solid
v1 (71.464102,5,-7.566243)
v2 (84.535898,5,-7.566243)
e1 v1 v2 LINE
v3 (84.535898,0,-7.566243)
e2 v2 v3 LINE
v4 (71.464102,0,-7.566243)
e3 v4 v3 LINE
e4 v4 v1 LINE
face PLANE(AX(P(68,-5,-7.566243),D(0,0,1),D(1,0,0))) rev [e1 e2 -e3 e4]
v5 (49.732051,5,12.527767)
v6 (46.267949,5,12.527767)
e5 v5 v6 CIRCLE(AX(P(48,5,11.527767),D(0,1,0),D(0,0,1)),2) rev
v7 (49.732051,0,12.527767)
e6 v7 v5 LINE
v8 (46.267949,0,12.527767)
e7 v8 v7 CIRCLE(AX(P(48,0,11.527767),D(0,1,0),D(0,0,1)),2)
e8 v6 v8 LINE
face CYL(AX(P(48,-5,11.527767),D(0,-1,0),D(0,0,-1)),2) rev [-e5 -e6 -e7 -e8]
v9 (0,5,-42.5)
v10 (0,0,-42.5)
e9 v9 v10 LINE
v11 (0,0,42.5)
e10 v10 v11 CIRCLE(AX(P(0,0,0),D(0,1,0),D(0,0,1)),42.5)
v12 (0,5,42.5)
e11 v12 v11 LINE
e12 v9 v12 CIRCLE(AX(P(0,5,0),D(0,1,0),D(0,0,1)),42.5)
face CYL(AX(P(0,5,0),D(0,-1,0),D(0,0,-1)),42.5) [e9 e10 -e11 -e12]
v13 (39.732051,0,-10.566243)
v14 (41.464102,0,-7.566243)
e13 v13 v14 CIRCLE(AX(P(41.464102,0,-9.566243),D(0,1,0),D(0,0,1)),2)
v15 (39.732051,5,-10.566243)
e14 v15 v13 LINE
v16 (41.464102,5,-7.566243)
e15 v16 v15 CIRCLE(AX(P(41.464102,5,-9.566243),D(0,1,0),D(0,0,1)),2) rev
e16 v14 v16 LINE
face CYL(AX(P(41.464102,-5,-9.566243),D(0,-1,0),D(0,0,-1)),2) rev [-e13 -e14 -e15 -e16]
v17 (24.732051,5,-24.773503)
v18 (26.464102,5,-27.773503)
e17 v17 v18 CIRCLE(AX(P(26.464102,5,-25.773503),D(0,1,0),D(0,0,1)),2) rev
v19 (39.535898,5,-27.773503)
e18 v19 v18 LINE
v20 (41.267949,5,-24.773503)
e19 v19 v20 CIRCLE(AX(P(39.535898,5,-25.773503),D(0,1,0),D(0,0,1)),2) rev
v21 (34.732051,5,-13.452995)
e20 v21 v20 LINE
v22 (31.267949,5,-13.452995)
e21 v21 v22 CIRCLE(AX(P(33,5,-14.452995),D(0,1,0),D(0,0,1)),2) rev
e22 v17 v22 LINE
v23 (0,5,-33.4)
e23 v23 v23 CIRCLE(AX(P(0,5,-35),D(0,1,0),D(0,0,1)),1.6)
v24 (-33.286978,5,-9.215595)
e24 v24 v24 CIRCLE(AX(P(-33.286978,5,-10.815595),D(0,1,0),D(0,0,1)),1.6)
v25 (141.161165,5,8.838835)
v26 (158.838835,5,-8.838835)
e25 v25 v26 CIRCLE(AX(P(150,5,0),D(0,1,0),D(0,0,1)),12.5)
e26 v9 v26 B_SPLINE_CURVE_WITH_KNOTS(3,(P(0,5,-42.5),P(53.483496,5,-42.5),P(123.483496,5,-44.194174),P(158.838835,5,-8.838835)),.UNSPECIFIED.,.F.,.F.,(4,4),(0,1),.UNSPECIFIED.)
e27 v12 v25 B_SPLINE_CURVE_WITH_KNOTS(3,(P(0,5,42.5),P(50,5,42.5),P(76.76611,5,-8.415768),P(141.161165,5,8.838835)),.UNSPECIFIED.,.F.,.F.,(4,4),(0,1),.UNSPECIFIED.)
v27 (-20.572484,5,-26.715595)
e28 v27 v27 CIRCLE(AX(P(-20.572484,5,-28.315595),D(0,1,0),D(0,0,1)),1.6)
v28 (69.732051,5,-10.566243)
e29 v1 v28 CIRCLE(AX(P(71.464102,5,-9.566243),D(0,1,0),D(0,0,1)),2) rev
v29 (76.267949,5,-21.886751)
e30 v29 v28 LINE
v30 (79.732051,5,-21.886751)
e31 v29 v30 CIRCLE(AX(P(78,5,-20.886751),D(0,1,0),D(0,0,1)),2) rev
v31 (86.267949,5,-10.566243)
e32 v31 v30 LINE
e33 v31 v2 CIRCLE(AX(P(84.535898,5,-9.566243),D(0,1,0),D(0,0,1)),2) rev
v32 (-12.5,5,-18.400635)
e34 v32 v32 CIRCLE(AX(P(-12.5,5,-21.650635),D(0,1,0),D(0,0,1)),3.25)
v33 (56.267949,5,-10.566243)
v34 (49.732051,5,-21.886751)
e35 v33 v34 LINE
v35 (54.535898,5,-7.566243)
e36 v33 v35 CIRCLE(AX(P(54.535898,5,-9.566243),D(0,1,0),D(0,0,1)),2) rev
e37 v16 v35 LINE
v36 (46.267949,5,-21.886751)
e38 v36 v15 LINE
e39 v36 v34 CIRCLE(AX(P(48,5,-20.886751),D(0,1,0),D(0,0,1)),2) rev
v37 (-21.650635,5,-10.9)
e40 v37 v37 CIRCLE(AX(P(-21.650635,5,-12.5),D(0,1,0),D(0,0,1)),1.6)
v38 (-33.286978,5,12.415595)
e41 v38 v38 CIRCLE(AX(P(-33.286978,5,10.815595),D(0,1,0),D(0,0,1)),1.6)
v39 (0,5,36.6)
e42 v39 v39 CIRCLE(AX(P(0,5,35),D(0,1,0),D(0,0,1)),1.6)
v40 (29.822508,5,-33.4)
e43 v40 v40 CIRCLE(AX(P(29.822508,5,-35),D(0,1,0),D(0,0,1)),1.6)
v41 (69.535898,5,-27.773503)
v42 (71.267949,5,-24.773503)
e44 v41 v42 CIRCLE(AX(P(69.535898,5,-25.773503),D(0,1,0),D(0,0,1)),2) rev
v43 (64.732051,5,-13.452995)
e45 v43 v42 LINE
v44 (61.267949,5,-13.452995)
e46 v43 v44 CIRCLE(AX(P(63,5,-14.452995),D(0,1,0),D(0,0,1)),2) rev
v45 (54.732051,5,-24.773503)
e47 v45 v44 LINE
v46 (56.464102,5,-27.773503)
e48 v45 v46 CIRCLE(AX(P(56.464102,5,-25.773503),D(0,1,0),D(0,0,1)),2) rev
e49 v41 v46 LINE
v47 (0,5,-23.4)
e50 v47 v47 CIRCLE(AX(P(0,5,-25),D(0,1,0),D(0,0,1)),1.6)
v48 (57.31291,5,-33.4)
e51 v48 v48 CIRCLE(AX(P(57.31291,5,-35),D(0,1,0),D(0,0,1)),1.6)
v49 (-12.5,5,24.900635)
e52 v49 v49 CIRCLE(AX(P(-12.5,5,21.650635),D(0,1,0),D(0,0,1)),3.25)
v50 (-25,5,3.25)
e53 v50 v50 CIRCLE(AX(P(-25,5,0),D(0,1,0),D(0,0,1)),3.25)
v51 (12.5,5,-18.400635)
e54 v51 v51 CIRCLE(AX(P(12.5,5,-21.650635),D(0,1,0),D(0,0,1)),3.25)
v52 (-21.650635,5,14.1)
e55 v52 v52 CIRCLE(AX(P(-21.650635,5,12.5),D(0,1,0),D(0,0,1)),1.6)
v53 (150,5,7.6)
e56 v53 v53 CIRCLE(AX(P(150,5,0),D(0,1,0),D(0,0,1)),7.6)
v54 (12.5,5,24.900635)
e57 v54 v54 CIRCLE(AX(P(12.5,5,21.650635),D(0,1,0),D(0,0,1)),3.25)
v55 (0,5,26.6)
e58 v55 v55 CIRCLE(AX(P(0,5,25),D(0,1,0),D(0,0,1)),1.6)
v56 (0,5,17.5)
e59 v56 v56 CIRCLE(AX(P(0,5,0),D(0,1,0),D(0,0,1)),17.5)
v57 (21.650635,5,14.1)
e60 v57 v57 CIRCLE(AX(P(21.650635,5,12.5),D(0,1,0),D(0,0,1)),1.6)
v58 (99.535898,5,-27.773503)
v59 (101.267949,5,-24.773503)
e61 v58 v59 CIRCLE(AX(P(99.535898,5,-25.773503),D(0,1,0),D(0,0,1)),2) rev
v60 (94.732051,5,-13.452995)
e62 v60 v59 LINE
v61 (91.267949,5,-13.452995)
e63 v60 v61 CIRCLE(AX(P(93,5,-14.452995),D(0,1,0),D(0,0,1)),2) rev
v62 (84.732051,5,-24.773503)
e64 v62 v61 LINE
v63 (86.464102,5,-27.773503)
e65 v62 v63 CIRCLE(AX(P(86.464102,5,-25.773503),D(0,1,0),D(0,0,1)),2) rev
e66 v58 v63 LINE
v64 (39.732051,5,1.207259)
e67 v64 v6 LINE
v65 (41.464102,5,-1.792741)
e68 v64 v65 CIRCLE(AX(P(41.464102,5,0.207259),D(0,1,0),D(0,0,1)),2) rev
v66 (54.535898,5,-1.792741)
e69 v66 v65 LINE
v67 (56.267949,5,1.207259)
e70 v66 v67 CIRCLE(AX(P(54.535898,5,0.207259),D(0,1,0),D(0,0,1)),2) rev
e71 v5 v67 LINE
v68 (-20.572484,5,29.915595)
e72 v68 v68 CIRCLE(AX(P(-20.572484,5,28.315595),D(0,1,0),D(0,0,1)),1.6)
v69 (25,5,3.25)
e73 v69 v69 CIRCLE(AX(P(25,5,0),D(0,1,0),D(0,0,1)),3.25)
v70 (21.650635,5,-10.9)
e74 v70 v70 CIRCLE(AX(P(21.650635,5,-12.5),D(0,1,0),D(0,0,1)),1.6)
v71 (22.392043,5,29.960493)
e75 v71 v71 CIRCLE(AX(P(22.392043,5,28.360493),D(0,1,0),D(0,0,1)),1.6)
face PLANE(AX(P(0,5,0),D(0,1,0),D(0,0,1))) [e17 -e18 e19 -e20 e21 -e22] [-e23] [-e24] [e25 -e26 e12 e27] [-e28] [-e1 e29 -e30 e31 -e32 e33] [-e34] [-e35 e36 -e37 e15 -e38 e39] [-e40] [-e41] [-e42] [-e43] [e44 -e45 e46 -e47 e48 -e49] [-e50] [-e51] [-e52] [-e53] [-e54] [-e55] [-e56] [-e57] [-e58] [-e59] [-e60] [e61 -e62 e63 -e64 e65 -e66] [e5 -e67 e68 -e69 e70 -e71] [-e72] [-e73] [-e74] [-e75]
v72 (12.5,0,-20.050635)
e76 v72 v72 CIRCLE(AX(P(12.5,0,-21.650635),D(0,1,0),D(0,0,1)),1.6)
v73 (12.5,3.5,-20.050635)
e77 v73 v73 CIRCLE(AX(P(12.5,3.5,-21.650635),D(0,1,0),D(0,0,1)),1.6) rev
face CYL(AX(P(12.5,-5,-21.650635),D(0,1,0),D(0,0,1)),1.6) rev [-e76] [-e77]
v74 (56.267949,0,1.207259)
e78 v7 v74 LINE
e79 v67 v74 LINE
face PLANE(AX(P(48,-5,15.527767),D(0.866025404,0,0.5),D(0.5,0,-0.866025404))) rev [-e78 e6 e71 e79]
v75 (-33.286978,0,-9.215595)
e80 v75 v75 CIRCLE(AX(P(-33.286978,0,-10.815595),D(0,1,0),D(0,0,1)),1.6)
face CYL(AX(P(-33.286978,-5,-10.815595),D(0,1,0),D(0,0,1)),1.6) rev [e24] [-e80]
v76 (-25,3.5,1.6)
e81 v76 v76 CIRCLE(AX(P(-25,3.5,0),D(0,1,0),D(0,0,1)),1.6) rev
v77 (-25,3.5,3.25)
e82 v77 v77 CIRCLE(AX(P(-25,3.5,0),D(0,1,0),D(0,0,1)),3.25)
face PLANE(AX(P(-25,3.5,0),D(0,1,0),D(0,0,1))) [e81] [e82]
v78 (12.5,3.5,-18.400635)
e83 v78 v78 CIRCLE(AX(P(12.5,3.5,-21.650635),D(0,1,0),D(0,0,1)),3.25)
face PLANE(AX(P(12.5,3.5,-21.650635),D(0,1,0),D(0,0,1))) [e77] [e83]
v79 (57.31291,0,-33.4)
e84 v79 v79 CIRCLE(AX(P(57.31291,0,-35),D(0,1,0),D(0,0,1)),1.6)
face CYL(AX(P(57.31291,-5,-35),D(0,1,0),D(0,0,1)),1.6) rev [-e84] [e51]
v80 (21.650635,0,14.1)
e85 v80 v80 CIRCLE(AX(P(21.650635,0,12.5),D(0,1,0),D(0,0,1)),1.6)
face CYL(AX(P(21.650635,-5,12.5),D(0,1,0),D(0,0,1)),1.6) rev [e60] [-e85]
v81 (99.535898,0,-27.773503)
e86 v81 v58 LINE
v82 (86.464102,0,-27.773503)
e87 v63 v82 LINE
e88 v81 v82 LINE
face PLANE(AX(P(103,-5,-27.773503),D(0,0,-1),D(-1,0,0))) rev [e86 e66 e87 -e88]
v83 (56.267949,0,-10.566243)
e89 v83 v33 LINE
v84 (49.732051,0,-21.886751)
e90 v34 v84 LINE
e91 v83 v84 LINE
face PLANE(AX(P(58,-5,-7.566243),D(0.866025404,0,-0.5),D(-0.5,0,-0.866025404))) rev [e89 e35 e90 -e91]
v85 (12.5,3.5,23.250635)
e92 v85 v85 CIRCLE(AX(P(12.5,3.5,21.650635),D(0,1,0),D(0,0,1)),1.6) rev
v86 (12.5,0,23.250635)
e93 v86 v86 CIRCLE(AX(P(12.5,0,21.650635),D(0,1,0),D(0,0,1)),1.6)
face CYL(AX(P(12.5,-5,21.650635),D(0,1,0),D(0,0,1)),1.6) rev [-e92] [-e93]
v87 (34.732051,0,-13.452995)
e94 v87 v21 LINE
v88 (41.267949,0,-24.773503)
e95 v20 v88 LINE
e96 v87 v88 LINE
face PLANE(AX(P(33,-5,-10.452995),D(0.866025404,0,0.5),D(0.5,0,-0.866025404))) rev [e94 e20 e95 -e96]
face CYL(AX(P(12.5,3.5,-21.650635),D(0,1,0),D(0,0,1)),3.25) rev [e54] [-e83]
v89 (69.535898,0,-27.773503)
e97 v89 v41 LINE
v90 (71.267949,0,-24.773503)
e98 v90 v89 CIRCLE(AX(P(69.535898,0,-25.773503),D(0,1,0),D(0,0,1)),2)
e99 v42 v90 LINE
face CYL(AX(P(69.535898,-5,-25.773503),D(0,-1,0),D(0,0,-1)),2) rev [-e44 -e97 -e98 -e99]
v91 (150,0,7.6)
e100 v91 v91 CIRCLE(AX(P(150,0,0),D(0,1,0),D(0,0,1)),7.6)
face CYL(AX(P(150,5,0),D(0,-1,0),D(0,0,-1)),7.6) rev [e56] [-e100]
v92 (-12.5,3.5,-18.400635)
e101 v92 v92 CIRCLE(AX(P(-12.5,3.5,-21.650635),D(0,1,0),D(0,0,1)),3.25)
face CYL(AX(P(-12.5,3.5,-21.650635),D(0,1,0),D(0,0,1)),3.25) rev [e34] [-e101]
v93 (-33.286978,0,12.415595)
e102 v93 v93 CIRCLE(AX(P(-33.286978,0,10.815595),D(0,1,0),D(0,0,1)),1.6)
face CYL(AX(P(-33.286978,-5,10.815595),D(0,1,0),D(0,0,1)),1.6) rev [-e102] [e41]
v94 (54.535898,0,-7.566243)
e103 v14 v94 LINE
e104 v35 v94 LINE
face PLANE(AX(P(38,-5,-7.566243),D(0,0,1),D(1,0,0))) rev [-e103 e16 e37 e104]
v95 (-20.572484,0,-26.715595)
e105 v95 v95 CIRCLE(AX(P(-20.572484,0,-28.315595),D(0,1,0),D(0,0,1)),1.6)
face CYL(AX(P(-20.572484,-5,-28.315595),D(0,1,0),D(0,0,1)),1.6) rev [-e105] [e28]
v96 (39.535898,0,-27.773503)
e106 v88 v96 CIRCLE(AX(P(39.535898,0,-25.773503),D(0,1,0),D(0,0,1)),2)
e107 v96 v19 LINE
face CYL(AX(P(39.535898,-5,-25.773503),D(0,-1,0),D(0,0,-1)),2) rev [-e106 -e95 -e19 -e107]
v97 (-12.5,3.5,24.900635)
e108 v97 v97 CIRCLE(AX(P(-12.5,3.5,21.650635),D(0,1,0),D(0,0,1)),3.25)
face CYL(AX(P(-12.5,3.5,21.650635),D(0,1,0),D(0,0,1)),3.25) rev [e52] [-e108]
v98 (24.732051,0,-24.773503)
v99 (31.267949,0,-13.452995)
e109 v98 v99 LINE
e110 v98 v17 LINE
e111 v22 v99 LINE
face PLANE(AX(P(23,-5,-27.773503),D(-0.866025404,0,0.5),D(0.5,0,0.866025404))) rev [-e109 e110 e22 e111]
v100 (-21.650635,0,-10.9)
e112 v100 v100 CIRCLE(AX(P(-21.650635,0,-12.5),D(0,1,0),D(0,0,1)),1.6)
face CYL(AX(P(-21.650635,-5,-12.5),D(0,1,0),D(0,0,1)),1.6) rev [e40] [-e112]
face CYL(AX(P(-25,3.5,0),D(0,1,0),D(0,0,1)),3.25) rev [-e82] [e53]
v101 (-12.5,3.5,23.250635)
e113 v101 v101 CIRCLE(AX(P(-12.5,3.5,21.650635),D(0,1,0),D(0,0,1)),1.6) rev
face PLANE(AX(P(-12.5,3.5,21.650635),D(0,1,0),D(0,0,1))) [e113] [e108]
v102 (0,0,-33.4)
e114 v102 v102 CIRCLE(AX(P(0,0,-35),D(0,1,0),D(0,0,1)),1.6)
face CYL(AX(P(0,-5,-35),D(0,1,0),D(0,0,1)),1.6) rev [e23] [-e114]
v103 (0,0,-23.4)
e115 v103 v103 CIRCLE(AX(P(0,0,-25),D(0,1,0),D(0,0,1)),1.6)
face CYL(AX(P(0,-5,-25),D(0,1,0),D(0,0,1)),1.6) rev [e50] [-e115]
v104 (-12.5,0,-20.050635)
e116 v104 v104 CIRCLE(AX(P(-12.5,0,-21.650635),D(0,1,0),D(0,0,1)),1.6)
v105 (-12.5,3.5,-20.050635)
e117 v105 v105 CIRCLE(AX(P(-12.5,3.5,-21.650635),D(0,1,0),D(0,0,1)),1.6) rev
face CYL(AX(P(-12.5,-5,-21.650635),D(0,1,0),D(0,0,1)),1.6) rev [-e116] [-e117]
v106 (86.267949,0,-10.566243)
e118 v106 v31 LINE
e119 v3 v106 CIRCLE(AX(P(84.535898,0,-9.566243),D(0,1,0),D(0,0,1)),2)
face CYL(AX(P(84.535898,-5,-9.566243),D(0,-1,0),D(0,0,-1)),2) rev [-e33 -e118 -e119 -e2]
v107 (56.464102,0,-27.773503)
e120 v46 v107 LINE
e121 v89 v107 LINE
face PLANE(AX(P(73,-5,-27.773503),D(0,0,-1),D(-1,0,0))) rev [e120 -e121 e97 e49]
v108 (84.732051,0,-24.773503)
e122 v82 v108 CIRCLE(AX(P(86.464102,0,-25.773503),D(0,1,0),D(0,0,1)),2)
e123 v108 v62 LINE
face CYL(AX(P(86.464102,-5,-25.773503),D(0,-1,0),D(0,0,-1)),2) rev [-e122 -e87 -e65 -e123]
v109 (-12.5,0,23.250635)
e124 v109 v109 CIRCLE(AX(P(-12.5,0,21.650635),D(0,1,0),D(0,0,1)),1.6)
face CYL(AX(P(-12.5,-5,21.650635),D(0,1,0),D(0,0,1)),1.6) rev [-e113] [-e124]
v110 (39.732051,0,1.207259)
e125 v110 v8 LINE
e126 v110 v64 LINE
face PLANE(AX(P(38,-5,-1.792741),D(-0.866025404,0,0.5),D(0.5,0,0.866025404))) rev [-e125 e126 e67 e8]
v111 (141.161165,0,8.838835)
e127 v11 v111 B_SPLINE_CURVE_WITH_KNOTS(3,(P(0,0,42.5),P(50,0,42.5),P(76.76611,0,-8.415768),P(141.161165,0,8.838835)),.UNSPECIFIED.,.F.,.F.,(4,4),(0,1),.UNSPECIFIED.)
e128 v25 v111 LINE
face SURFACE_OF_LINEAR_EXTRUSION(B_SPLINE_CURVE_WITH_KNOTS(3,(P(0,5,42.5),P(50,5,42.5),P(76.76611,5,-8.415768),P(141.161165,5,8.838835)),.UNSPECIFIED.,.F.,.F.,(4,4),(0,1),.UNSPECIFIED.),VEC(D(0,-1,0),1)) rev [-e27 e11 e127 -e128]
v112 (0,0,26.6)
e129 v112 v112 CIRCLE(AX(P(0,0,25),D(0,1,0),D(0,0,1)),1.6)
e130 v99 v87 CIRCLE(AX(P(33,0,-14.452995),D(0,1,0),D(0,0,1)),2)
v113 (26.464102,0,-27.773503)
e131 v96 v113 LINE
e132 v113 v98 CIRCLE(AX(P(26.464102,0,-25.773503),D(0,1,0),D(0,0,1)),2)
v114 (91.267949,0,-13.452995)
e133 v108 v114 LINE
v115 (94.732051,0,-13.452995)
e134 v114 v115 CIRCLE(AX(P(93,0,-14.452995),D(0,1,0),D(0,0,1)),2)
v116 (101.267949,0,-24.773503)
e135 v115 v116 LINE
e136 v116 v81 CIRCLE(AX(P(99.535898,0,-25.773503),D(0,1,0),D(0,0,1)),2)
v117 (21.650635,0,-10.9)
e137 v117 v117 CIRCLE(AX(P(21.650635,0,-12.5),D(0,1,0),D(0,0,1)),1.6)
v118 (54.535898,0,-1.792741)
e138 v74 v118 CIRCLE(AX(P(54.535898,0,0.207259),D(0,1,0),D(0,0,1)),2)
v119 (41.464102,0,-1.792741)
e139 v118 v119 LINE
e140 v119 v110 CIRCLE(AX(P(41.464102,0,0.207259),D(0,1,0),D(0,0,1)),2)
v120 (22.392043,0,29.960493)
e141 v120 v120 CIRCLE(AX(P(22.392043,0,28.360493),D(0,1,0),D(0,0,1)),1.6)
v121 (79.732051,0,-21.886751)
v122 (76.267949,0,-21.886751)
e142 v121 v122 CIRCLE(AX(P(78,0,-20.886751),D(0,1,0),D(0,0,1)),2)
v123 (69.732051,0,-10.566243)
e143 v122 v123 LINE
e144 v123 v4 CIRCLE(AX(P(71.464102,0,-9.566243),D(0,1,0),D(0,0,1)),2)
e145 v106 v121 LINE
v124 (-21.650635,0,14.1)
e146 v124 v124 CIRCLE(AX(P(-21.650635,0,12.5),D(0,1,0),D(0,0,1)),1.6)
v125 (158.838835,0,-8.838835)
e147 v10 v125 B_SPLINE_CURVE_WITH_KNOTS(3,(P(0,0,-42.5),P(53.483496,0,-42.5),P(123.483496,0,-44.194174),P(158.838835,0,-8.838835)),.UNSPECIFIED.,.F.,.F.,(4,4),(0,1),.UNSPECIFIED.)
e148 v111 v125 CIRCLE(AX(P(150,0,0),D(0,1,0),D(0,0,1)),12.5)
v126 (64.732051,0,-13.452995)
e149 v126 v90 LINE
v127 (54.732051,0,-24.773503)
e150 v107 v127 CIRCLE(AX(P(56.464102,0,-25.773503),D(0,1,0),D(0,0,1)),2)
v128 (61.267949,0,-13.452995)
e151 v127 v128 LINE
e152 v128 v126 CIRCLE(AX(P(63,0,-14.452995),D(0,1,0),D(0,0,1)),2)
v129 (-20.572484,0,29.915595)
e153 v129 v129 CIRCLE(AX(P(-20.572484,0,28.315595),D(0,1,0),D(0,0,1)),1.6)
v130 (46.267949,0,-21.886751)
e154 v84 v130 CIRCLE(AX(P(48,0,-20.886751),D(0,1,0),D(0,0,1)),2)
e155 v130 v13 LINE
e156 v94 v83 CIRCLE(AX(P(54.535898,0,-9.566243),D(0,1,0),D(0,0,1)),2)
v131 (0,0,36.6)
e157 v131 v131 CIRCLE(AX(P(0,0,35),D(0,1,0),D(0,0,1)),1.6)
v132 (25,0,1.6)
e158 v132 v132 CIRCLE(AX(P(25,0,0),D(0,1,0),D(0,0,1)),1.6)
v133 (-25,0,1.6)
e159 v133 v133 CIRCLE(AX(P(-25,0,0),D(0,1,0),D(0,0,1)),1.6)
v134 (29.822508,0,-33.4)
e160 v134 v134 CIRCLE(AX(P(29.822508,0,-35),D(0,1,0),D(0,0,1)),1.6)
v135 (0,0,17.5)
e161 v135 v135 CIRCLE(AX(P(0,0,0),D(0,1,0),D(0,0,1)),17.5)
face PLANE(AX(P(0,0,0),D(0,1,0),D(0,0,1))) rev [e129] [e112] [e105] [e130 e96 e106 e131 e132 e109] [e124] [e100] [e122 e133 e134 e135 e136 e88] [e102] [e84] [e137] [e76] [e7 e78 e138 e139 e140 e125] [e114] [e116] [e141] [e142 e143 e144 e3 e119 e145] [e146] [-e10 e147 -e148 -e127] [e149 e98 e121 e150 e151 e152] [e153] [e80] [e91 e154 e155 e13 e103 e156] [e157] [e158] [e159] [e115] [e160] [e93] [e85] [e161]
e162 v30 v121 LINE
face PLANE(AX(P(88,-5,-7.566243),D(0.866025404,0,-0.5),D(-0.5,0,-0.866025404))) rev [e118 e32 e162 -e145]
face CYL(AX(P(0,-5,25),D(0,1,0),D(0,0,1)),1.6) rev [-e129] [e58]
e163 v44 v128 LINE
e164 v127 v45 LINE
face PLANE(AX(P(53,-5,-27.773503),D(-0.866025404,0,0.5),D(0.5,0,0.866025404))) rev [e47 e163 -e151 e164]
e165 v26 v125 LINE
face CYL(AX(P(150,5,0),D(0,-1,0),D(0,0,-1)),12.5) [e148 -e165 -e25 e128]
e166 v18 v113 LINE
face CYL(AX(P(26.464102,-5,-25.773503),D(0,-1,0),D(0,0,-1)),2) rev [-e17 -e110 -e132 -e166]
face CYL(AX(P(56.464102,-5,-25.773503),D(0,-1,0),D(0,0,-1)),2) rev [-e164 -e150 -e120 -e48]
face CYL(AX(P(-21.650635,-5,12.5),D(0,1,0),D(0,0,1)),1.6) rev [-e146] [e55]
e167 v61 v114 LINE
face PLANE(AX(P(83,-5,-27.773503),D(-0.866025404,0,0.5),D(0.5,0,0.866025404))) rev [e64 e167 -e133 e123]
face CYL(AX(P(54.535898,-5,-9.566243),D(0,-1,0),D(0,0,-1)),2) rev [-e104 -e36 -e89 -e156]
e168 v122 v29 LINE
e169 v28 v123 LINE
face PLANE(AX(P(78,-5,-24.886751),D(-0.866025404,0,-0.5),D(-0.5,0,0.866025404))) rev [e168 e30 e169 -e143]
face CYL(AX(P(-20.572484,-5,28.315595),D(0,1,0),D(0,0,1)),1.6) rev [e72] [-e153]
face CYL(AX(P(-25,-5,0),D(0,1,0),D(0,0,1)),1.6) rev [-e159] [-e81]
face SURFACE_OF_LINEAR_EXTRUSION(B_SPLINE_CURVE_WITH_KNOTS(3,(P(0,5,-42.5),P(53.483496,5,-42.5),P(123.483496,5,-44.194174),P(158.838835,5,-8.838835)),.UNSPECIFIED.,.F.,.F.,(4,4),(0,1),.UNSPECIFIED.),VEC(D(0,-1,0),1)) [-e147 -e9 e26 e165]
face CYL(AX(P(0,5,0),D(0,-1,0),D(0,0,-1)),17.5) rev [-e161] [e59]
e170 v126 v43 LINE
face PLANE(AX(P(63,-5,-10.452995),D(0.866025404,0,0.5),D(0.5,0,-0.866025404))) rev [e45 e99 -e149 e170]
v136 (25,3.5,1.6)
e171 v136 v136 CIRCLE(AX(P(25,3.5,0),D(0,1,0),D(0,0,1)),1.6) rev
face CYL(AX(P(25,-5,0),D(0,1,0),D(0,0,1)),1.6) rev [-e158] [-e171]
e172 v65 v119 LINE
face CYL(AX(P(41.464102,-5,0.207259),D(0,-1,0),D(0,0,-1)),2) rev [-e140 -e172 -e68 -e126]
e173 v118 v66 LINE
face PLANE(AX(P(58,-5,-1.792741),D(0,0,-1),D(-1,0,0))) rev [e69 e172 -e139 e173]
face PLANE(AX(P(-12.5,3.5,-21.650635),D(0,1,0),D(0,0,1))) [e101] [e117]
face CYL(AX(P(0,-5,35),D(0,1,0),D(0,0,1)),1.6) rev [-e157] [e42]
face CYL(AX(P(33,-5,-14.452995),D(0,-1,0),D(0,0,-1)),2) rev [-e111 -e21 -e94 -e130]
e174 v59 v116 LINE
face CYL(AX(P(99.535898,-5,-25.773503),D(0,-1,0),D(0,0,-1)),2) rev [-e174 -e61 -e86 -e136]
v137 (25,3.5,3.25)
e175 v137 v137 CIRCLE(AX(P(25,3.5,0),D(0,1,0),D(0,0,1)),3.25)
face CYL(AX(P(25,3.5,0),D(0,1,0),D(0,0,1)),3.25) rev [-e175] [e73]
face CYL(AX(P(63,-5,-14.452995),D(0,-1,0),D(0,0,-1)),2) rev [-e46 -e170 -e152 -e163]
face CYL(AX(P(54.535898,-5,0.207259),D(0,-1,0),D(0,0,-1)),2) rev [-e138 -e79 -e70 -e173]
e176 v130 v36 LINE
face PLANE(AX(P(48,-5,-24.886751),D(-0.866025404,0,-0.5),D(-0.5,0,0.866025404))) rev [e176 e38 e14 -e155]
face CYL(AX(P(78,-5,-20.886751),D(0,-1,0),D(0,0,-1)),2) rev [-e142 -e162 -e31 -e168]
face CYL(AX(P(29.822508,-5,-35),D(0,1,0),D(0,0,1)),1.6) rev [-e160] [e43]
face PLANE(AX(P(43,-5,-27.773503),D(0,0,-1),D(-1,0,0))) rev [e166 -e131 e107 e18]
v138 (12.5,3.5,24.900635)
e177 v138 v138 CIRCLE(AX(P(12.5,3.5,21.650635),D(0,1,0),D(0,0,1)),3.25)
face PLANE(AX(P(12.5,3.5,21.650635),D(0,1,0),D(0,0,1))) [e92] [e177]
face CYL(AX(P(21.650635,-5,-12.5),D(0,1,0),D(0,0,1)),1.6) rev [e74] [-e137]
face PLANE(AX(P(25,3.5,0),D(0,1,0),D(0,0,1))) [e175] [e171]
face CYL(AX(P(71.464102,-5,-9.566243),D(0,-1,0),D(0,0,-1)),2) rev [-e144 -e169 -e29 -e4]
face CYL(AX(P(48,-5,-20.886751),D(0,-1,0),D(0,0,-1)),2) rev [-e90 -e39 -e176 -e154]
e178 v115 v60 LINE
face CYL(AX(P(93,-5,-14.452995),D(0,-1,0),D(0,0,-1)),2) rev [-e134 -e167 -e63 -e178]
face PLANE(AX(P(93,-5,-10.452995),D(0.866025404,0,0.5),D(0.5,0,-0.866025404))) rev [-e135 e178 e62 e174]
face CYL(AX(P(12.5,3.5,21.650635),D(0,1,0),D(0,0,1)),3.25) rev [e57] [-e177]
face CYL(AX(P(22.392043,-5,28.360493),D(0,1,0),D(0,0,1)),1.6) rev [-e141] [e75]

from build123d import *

# Parameters (mm, degrees)
BOSS_EXTRUDE3_OUTLINE_R   = 17.5
BOSS_EXTRUDE3_OUTLINE_R_2 = 7.6
BOSS_EXTRUDE3_DEPTH       = 5
SKETCH2_R                 = 1.6
CUT_EXTRUDE1_DEPTH        = 10
SKETCH3_R                 = 1.6
CUT_EXTRUDE2_DEPTH        = 10
SKETCH4_R                 = 1.6
CUT_EXTRUDE3_DEPTH        = 10
SKETCH5_R                 = 3.25
CUT_EXTRUDE5_DEPTH        = 1.5
CUT_EXTRUDE6_DEPTH        = 10
FILLET3_R                 = 2
FILL_PATTERN2_DEPTH       = 5
CUT_EXTRUDE7_DEPTH        = 10
FILLET4_R                 = 2
FILL_PATTERN4_DEPTH       = 5


# Read off the part's stored shape, not the designer's step: Boss-Extrude3, Fill Pattern2, Fill Pattern4
with BuildPart() as part:
    # Boss-Extrude3 outline → Boss-Extrude3 (new body)
    with BuildSketch(Plane(origin=(0, 0, 0), x_dir=(1, 0, 0), z_dir=(0, 1, 0))):
        with BuildLine():
            ThreePointArc((0, 42.5), (-42.5, 0), (0, -42.5))
            add(Edge.make_bspline(
                [(0, -42.5), (50, -42.5), (76.766110149, 8.415768242), (141.161165235, -8.838834765)],
                knots=[0, 0, 0, 0, 1, 1, 1, 1], degree=3))
            ThreePointArc((141.161165235, -8.838834765), (158.838834765, -8.838834765), (158.838834765, 8.838834765))
            add(Edge.make_bspline(
                [(0, 42.5), (53.483495706, 42.5), (123.483495706, 44.194173824), (158.838834765, 8.838834765)],
                knots=[0, 0, 0, 0, 1, 1, 1, 1], degree=3))
        make_face()
        Circle(BOSS_EXTRUDE3_OUTLINE_R, mode=Mode.SUBTRACT)
        with Locations((150, 0)):
            Circle(BOSS_EXTRUDE3_OUTLINE_R_2, mode=Mode.SUBTRACT)
    extrude(amount=BOSS_EXTRUDE3_DEPTH)

    # Sketch2 → Cut-Extrude1 (cut)
    with BuildSketch(Plane(origin=(0, 5, 0), x_dir=(1, 0, 0), z_dir=(0, 1, 0))):
        with Locations(Location((0, 35, 0), (0, 0, 270))):
            Circle(SKETCH2_R)
        with Locations(Location((0, 25, 0), (0, 0, 270))):
            Circle(SKETCH2_R)
        with Locations(Location((12.5, 21.650635095, 0), (0, 0, 270))):
            Circle(SKETCH2_R)
        with Locations(Location((21.650635095, 12.5, 0), (0, 0, 270))):
            Circle(SKETCH2_R)
        with Locations(Location((25, 0, 0), (0, 0, 270))):
            Circle(SKETCH2_R)
        with Locations(Location((21.650635095, -12.5, 0), (0, 0, 270))):
            Circle(SKETCH2_R)
        with Locations(Location((12.5, -21.650635095, 0), (0, 0, 270))):
            Circle(SKETCH2_R)
        with Locations(Location((0, -25, 0), (0, 0, 270))):
            Circle(SKETCH2_R)
        with Locations(Location((-12.5, -21.650635095, 0), (0, 0, 270))):
            Circle(SKETCH2_R)
        with Locations(Location((-21.650635095, -12.5, 0), (0, 0, 270))):
            Circle(SKETCH2_R)
        with Locations(Location((-25, 0, 0), (0, 0, 270))):
            Circle(SKETCH2_R)
        with Locations(Location((-21.650635095, 12.5, 0), (0, 0, 270))):
            Circle(SKETCH2_R)
        with Locations(Location((-12.5, 21.650635095, 0), (0, 0, 270))):
            Circle(SKETCH2_R)
        with Locations(Location((-20.57248383, 28.315594803, 0), (0, 0, 270))):
            Circle(SKETCH2_R)
        with Locations(Location((-33.28697807, 10.815594803, 0), (0, 0, 270))):
            Circle(SKETCH2_R)
        with Locations(Location((-33.28697807, -10.815594803, 0), (0, 0, 270))):
            Circle(SKETCH2_R)
        with Locations(Location((-20.57248383, -28.315594803, 0), (0, 0, 270))):
            Circle(SKETCH2_R)
        with Locations(Location((0, -35, 0), (0, 0, 270))):
            Circle(SKETCH2_R)
    extrude(amount=-CUT_EXTRUDE1_DEPTH, mode=Mode.SUBTRACT)

    # Sketch3 → Cut-Extrude2 (cut)
    with BuildSketch(Plane(origin=(0, 5, 0), x_dir=(1, 0, 0), z_dir=(0, 1, 0))):
        with Locations(Location((29.822508304, 35, 0), (0, 0, 270))):
            Circle(SKETCH3_R)
        with Locations(Location((57.312909887, 35, 0), (0, 0, 270))):
            Circle(SKETCH3_R)
    extrude(amount=-CUT_EXTRUDE2_DEPTH, mode=Mode.SUBTRACT)

    # Sketch4 → Cut-Extrude3 (cut)
    with BuildSketch(Plane(origin=(0, 5, 0), x_dir=(1, 0, 0), z_dir=(0, 1, 0))):
        with Locations(Location((22.392043347, -28.36049342, 0), (0, 0, 270))):
            Circle(SKETCH4_R)
    extrude(amount=-CUT_EXTRUDE3_DEPTH, mode=Mode.SUBTRACT)

    # Sketch5 → Cut-Extrude5 (cut)
    with BuildSketch(Plane(origin=(0, 5, 0), x_dir=(1, 0, 0), z_dir=(0, 1, 0))):
        with Locations(Location((25, 0, 0), (0, 0, 270))):
            Circle(SKETCH5_R)
        with Locations(Location((12.5, -21.650635095, 0), (0, 0, 270))):
            Circle(SKETCH5_R)
        with Locations(Location((-12.5, -21.650635095, 0), (0, 0, 270))):
            Circle(SKETCH5_R)
        with Locations(Location((-25, 0, 0), (0, 0, 270))):
            Circle(SKETCH5_R)
        with Locations(Location((-12.5, 21.650635095, 0), (0, 0, 270))):
            Circle(SKETCH5_R)
        with Locations(Location((12.5, 21.650635095, 0), (0, 0, 270))):
            Circle(SKETCH5_R)
    extrude(amount=-CUT_EXTRUDE5_DEPTH, mode=Mode.SUBTRACT)

    # Sketch6 → Cut-Extrude6 (cut)
    with BuildSketch(Plane(origin=(0, 5, 0), x_dir=(1, 0, 0), z_dir=(0, 1, 0))):
        Polygon((43, 27.773502692), (23, 27.773502692), (33, 10.452994616), align=None)
    extrude(amount=-CUT_EXTRUDE6_DEPTH, mode=Mode.SUBTRACT)

    # Fillet3
    fillet3_edges = [part.edges().sort_by_distance(p)[0] for p in [
        (43, 2.5, -27.773502692),
        (33, 2.5, -10.452994616),
        (23, 2.5, -27.773502692),
    ]]
    fillet(fillet3_edges, radius=FILLET3_R)

    # Fill Pattern2 outline → Fill Pattern2 (cut)
    with BuildSketch(Plane(origin=(0, 0, 0), x_dir=(1, 0, 0), z_dir=(0, 1, 0))):
        with BuildLine():
            ThreePointArc((41.464101615, 1.792740578), (39.732050808, 0.792740578), (39.732050808, -1.207259422))
            Line((39.732050808, -1.207259422), (46.267949192, -12.527767497))
            ThreePointArc((46.267949192, -12.527767497), (48, -13.527767497), (49.732050808, -12.527767497))
            Line((49.732050808, -12.527767497), (56.267949192, -1.207259422))
            ThreePointArc((56.267949192, -1.207259422), (56.267949192, 0.792740578), (54.535898385, 1.792740578))
            Line((54.535898385, 1.792740578), (41.464101615, 1.792740578))
        make_face()
        with BuildLine():
            ThreePointArc((101.267949192, 24.773502692), (101.267949192, 26.773502692), (99.535898385, 27.773502692))
            Line((99.535898385, 27.773502692), (86.464101615, 27.773502692))
            ThreePointArc((86.464101615, 27.773502692), (84.732050808, 26.773502692), (84.732050808, 24.773502692))
            Line((84.732050808, 24.773502692), (91.267949192, 13.452994616))
            ThreePointArc((91.267949192, 13.452994616), (93, 12.452994616), (94.732050808, 13.452994616))
            Line((94.732050808, 13.452994616), (101.267949192, 24.773502692))
        make_face()
        with BuildLine():
            ThreePointArc((71.267949192, 24.773502692), (71.267949192, 26.773502692), (69.535898385, 27.773502692))
            Line((69.535898385, 27.773502692), (56.464101615, 27.773502692))
            ThreePointArc((56.464101615, 27.773502692), (54.732050808, 26.773502692), (54.732050808, 24.773502692))
            Line((54.732050808, 24.773502692), (61.267949192, 13.452994616))
            ThreePointArc((61.267949192, 13.452994616), (63, 12.452994616), (64.732050808, 13.452994616))
            Line((64.732050808, 13.452994616), (71.267949192, 24.773502692))
        make_face()
    extrude(amount=FILL_PATTERN2_DEPTH, mode=Mode.SUBTRACT)

    # Sketch7 → Cut-Extrude7 (cut)
    with BuildSketch(Plane(origin=(0, 5, 0), x_dir=(1, 0, 0), z_dir=(0, 1, 0))):
        Polygon((58, 7.56624327), (48, 24.886751346), (38, 7.56624327), align=None)
    extrude(amount=-CUT_EXTRUDE7_DEPTH, mode=Mode.SUBTRACT)

    # Fillet4
    fillet4_edges = [part.edges().sort_by_distance(p)[0] for p in [
        (58, 2.5, -7.56624327),
        (38, 2.5, -7.56624327),
        (48, 2.5, -24.886751346),
    ]]
    fillet(fillet4_edges, radius=FILLET4_R)

    # Fill Pattern4 outline → Fill Pattern4 (cut)
    with BuildSketch(Plane(origin=(0, 0, 0), x_dir=(1, 0, 0), z_dir=(0, 1, 0))):
        with BuildLine():
            ThreePointArc((69.732050808, 10.56624327), (69.732050808, 8.56624327), (71.464101615, 7.56624327))
            Line((71.464101615, 7.56624327), (84.535898385, 7.56624327))
            ThreePointArc((84.535898385, 7.56624327), (86.267949192, 8.56624327), (86.267949192, 10.56624327))
            Line((86.267949192, 10.56624327), (79.732050808, 21.886751346))
            ThreePointArc((79.732050808, 21.886751346), (78, 22.886751346), (76.267949192, 21.886751346))
            Line((76.267949192, 21.886751346), (69.732050808, 10.56624327))
        make_face()
    extrude(amount=FILL_PATTERN4_DEPTH, mode=Mode.SUBTRACT)


solid = part.part
